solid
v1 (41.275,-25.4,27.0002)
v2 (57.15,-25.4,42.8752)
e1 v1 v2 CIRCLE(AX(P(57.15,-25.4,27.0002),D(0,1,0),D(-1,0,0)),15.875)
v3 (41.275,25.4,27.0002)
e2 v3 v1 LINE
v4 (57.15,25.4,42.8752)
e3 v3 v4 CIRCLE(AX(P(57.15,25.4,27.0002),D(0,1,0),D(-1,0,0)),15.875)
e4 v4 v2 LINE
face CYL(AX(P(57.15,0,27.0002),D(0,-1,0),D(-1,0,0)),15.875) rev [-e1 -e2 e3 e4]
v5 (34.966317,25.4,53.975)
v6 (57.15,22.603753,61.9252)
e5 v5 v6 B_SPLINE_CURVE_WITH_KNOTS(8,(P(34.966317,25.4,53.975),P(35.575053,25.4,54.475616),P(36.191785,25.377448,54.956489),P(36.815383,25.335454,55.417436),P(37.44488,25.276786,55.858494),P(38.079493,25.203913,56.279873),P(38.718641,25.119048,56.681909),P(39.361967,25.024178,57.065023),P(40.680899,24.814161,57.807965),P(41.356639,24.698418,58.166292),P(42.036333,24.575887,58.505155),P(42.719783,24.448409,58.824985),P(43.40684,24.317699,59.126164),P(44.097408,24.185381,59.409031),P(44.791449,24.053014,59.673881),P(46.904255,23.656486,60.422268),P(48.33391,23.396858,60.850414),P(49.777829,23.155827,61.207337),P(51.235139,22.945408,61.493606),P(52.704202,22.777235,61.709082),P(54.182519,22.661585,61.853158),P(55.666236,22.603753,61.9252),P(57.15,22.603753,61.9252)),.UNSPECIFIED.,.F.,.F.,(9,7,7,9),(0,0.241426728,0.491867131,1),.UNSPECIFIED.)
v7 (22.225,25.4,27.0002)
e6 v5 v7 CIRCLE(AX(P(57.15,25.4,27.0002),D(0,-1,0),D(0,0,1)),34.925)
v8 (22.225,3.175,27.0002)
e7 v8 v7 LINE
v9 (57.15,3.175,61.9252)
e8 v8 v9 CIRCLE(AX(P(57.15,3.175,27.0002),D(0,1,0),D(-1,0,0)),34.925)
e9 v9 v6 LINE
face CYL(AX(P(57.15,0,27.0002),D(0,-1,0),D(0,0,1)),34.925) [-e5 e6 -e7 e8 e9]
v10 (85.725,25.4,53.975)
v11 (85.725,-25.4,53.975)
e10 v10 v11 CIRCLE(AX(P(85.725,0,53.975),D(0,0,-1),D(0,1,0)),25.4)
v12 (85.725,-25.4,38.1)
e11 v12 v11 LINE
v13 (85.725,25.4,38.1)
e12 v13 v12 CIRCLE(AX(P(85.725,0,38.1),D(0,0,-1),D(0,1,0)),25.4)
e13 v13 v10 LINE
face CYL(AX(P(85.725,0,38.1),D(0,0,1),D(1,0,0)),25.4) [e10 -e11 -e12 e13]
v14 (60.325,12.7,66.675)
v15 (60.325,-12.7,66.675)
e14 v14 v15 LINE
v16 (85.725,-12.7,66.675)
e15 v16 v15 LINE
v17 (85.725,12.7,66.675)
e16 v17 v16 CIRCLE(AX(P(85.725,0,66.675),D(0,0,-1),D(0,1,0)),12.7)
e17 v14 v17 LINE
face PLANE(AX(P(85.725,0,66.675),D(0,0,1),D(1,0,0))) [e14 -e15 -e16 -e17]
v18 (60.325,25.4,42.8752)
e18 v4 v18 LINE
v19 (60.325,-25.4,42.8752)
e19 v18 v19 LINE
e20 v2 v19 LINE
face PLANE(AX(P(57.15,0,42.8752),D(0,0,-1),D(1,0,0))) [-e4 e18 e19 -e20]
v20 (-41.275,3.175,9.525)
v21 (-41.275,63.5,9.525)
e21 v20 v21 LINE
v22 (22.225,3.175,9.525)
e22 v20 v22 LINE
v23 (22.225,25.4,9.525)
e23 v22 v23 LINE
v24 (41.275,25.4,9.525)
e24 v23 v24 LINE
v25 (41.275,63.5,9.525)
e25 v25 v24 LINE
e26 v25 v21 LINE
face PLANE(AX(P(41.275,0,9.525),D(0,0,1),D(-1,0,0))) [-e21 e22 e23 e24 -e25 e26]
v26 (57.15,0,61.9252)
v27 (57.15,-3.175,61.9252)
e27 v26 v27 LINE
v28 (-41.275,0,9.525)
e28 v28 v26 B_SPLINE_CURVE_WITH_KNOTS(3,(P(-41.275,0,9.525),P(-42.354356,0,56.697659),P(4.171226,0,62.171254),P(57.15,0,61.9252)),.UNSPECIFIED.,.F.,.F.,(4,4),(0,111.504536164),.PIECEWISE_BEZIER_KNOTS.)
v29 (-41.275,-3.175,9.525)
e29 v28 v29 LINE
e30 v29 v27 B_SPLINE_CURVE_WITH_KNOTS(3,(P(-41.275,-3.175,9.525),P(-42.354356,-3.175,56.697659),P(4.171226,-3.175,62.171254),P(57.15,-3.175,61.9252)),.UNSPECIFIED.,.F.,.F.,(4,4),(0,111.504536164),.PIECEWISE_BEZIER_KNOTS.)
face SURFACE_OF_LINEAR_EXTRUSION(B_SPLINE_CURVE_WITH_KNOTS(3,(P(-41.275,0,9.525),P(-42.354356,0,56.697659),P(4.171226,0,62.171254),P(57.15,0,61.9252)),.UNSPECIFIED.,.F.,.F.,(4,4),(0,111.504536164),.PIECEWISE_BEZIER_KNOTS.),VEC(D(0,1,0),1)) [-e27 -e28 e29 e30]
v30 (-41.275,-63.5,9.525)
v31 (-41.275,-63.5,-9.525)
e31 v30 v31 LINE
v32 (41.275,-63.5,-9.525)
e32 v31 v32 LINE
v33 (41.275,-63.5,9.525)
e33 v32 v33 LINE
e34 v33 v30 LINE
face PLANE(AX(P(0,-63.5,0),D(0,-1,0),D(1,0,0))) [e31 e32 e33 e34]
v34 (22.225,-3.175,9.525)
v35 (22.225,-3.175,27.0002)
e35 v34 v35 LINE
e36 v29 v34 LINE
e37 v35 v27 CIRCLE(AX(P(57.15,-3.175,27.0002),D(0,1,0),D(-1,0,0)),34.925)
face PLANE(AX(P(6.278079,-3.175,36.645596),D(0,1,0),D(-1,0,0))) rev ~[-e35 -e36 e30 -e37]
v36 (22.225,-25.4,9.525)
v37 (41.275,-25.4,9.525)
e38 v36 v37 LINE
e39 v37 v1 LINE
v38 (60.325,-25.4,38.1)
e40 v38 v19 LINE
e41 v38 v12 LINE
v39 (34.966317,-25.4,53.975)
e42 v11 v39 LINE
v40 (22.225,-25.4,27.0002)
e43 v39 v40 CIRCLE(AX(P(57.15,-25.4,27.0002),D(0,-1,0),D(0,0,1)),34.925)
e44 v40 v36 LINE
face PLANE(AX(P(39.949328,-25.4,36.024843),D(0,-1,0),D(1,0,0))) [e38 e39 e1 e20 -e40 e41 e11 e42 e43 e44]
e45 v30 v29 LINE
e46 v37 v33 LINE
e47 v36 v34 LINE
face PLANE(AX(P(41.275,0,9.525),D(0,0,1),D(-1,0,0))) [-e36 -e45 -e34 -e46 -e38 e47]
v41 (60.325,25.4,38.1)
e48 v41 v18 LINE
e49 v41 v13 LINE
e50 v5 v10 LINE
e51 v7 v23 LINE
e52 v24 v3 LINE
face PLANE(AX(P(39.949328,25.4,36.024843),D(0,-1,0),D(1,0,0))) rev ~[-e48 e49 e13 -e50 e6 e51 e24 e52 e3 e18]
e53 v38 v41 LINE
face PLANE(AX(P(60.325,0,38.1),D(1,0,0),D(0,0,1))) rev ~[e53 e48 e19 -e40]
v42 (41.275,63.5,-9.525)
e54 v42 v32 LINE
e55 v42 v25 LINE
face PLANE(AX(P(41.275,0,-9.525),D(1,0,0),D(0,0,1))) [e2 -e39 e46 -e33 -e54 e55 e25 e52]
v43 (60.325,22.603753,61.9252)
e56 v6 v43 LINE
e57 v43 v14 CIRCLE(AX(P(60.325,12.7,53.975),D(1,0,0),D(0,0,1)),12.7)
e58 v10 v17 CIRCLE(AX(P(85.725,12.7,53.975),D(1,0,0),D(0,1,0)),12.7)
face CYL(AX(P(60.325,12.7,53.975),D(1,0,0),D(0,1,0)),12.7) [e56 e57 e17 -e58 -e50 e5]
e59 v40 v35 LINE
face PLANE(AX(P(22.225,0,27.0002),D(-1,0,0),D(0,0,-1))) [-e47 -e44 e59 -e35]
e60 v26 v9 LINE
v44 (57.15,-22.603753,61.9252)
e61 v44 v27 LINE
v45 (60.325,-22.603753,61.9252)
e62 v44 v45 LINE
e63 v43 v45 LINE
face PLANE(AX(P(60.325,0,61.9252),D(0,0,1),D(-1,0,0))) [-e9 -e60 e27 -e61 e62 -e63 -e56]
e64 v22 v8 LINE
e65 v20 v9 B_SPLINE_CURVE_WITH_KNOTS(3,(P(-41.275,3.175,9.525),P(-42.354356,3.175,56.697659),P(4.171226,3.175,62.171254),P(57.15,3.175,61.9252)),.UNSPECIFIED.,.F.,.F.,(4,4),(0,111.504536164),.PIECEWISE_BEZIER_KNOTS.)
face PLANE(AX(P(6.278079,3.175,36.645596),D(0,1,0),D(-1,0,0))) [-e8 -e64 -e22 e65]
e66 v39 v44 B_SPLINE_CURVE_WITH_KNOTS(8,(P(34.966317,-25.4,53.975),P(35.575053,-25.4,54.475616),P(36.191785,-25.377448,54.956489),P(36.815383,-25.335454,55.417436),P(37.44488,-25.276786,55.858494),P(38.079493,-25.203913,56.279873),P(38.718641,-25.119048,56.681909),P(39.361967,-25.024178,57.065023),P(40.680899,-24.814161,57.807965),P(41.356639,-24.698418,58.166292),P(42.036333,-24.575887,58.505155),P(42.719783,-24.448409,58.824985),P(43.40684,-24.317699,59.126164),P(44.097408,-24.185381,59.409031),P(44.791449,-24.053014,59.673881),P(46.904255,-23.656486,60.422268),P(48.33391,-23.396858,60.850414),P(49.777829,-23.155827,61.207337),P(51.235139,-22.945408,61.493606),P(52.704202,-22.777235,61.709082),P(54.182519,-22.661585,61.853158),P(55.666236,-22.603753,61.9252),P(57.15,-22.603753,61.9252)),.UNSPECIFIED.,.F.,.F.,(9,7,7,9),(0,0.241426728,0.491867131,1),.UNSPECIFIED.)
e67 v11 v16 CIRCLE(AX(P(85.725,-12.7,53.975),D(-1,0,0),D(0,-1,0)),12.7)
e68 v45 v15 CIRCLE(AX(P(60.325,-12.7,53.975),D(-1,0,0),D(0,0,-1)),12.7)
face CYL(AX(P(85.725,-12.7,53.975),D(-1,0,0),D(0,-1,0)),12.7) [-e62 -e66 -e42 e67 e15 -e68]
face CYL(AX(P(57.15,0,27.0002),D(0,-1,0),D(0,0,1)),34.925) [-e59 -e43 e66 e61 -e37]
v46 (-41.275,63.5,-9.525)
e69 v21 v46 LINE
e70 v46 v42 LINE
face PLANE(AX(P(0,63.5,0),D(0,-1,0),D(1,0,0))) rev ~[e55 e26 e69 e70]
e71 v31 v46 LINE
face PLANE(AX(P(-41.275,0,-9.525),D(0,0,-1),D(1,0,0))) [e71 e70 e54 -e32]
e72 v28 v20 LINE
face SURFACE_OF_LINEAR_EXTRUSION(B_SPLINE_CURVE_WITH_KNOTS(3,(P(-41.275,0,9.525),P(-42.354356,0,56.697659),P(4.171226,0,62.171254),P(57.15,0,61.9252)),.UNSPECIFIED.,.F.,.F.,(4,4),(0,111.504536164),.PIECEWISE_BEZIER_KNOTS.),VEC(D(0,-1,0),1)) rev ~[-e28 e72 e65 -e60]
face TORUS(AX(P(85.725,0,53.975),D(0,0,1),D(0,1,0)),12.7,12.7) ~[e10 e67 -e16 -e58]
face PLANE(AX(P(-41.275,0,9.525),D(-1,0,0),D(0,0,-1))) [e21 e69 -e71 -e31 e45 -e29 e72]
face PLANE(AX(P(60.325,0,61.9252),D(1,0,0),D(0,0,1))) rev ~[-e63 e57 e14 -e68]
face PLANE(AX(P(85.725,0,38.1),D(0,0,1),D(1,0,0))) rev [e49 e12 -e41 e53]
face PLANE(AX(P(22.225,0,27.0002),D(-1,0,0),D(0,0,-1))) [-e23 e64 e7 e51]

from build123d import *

# Parameters (mm, degrees)
F1_DEPTH = 63.5
F0_W     = 25.4
F0_H     = 19.05
F0_H_2   = 4.7752
F0_H_3   = 4.7498
F2_DEPTH = 25.4
F4_DEPTH = 3.175
F5_R     = 12.7


with BuildPart() as f1:
    # F0 (on Front) → F1 (new body, symmetric)
    with BuildSketch(Plane.XZ):
        Polygon((-41.275, -9.525), (41.275, -9.525), (41.275, 9.525), (22.225, 9.525), (-41.275, 9.525), align=None)
    extrude(amount=F1_DEPTH, both=True)

    # F0 (on Front) → F2 (join, symmetric)
    with BuildSketch(Plane.XZ):
        with BuildLine():
            Line((22.225, 9.525), (41.275, 9.525))
            Line((41.275, 9.525), (41.275, 27.0002))
            ThreePointArc((41.275, 27.0002), (45.9246798487, 38.2255201513), (57.15, 42.8752))
            Line((57.15, 42.8752), (60.325, 42.8752))
            Line((60.325, 42.8752), (60.325, 61.9252))
            Line((60.325, 61.9252), (57.15, 61.9252))
            ThreePointArc((57.15, 61.9252), (32.4542956671, 51.6959043329), (22.225, 27.0002))
            Line((22.225, 27.0002), (22.225, 9.525))
        make_face()
        with Locations((73.025, 52.4002)):
            Rectangle(F0_W, F0_H)
        with Locations((73.025, 40.4876)):
            Rectangle(F0_W, F0_H_2)
        with Locations((73.025, 64.3001)):
            Rectangle(F0_W, F0_H_3)
    extrude(amount=F2_DEPTH, both=True)

    # F0 (on Front) → F3 (revolve)
    with BuildSketch(Plane.XZ):
        Polygon((85.725, 66.675), (85.725, 61.9252), (85.725, 42.8752), (85.725, 38.1), (111.125, 38.1), (111.125, 66.675), align=None)
    revolve(axis=Axis((85.725, 0, 52.3875), (0, 0, 1)))

    # F0 (on Front) → F4 (join, symmetric)
    with BuildSketch(Plane.XZ):
        with BuildLine():
            add(Edge.make_bspline(
                [(-41.275, 9.525), (-42.3543564975, 56.6976591945), (4.171225708, 62.171254307), (57.15, 61.9252)],
                knots=[0, 0, 0, 0, 111.5045361635, 111.5045361635, 111.5045361635, 111.5045361635], degree=3))
            Line((-41.275, 9.525), (22.225, 9.525))
            Line((22.225, 9.525), (22.225, 27.0002))
            ThreePointArc((22.225, 27.0002), (32.4542956671, 51.6959043329), (57.15, 61.9252))
        make_face()
    extrude(amount=F4_DEPTH, both=True)

    # F5
    f5_edges = [f1.edges().sort_by_distance(p)[0] for p in [
        (85.725, 25.4, 52.3875),
        (73.025, 25.4, 66.675),
        (73.025, -25.4, 66.675),
        (111.125, 0, 66.675),
    ]]
    fillet(f5_edges, radius=F5_R)


solid = f1.part
